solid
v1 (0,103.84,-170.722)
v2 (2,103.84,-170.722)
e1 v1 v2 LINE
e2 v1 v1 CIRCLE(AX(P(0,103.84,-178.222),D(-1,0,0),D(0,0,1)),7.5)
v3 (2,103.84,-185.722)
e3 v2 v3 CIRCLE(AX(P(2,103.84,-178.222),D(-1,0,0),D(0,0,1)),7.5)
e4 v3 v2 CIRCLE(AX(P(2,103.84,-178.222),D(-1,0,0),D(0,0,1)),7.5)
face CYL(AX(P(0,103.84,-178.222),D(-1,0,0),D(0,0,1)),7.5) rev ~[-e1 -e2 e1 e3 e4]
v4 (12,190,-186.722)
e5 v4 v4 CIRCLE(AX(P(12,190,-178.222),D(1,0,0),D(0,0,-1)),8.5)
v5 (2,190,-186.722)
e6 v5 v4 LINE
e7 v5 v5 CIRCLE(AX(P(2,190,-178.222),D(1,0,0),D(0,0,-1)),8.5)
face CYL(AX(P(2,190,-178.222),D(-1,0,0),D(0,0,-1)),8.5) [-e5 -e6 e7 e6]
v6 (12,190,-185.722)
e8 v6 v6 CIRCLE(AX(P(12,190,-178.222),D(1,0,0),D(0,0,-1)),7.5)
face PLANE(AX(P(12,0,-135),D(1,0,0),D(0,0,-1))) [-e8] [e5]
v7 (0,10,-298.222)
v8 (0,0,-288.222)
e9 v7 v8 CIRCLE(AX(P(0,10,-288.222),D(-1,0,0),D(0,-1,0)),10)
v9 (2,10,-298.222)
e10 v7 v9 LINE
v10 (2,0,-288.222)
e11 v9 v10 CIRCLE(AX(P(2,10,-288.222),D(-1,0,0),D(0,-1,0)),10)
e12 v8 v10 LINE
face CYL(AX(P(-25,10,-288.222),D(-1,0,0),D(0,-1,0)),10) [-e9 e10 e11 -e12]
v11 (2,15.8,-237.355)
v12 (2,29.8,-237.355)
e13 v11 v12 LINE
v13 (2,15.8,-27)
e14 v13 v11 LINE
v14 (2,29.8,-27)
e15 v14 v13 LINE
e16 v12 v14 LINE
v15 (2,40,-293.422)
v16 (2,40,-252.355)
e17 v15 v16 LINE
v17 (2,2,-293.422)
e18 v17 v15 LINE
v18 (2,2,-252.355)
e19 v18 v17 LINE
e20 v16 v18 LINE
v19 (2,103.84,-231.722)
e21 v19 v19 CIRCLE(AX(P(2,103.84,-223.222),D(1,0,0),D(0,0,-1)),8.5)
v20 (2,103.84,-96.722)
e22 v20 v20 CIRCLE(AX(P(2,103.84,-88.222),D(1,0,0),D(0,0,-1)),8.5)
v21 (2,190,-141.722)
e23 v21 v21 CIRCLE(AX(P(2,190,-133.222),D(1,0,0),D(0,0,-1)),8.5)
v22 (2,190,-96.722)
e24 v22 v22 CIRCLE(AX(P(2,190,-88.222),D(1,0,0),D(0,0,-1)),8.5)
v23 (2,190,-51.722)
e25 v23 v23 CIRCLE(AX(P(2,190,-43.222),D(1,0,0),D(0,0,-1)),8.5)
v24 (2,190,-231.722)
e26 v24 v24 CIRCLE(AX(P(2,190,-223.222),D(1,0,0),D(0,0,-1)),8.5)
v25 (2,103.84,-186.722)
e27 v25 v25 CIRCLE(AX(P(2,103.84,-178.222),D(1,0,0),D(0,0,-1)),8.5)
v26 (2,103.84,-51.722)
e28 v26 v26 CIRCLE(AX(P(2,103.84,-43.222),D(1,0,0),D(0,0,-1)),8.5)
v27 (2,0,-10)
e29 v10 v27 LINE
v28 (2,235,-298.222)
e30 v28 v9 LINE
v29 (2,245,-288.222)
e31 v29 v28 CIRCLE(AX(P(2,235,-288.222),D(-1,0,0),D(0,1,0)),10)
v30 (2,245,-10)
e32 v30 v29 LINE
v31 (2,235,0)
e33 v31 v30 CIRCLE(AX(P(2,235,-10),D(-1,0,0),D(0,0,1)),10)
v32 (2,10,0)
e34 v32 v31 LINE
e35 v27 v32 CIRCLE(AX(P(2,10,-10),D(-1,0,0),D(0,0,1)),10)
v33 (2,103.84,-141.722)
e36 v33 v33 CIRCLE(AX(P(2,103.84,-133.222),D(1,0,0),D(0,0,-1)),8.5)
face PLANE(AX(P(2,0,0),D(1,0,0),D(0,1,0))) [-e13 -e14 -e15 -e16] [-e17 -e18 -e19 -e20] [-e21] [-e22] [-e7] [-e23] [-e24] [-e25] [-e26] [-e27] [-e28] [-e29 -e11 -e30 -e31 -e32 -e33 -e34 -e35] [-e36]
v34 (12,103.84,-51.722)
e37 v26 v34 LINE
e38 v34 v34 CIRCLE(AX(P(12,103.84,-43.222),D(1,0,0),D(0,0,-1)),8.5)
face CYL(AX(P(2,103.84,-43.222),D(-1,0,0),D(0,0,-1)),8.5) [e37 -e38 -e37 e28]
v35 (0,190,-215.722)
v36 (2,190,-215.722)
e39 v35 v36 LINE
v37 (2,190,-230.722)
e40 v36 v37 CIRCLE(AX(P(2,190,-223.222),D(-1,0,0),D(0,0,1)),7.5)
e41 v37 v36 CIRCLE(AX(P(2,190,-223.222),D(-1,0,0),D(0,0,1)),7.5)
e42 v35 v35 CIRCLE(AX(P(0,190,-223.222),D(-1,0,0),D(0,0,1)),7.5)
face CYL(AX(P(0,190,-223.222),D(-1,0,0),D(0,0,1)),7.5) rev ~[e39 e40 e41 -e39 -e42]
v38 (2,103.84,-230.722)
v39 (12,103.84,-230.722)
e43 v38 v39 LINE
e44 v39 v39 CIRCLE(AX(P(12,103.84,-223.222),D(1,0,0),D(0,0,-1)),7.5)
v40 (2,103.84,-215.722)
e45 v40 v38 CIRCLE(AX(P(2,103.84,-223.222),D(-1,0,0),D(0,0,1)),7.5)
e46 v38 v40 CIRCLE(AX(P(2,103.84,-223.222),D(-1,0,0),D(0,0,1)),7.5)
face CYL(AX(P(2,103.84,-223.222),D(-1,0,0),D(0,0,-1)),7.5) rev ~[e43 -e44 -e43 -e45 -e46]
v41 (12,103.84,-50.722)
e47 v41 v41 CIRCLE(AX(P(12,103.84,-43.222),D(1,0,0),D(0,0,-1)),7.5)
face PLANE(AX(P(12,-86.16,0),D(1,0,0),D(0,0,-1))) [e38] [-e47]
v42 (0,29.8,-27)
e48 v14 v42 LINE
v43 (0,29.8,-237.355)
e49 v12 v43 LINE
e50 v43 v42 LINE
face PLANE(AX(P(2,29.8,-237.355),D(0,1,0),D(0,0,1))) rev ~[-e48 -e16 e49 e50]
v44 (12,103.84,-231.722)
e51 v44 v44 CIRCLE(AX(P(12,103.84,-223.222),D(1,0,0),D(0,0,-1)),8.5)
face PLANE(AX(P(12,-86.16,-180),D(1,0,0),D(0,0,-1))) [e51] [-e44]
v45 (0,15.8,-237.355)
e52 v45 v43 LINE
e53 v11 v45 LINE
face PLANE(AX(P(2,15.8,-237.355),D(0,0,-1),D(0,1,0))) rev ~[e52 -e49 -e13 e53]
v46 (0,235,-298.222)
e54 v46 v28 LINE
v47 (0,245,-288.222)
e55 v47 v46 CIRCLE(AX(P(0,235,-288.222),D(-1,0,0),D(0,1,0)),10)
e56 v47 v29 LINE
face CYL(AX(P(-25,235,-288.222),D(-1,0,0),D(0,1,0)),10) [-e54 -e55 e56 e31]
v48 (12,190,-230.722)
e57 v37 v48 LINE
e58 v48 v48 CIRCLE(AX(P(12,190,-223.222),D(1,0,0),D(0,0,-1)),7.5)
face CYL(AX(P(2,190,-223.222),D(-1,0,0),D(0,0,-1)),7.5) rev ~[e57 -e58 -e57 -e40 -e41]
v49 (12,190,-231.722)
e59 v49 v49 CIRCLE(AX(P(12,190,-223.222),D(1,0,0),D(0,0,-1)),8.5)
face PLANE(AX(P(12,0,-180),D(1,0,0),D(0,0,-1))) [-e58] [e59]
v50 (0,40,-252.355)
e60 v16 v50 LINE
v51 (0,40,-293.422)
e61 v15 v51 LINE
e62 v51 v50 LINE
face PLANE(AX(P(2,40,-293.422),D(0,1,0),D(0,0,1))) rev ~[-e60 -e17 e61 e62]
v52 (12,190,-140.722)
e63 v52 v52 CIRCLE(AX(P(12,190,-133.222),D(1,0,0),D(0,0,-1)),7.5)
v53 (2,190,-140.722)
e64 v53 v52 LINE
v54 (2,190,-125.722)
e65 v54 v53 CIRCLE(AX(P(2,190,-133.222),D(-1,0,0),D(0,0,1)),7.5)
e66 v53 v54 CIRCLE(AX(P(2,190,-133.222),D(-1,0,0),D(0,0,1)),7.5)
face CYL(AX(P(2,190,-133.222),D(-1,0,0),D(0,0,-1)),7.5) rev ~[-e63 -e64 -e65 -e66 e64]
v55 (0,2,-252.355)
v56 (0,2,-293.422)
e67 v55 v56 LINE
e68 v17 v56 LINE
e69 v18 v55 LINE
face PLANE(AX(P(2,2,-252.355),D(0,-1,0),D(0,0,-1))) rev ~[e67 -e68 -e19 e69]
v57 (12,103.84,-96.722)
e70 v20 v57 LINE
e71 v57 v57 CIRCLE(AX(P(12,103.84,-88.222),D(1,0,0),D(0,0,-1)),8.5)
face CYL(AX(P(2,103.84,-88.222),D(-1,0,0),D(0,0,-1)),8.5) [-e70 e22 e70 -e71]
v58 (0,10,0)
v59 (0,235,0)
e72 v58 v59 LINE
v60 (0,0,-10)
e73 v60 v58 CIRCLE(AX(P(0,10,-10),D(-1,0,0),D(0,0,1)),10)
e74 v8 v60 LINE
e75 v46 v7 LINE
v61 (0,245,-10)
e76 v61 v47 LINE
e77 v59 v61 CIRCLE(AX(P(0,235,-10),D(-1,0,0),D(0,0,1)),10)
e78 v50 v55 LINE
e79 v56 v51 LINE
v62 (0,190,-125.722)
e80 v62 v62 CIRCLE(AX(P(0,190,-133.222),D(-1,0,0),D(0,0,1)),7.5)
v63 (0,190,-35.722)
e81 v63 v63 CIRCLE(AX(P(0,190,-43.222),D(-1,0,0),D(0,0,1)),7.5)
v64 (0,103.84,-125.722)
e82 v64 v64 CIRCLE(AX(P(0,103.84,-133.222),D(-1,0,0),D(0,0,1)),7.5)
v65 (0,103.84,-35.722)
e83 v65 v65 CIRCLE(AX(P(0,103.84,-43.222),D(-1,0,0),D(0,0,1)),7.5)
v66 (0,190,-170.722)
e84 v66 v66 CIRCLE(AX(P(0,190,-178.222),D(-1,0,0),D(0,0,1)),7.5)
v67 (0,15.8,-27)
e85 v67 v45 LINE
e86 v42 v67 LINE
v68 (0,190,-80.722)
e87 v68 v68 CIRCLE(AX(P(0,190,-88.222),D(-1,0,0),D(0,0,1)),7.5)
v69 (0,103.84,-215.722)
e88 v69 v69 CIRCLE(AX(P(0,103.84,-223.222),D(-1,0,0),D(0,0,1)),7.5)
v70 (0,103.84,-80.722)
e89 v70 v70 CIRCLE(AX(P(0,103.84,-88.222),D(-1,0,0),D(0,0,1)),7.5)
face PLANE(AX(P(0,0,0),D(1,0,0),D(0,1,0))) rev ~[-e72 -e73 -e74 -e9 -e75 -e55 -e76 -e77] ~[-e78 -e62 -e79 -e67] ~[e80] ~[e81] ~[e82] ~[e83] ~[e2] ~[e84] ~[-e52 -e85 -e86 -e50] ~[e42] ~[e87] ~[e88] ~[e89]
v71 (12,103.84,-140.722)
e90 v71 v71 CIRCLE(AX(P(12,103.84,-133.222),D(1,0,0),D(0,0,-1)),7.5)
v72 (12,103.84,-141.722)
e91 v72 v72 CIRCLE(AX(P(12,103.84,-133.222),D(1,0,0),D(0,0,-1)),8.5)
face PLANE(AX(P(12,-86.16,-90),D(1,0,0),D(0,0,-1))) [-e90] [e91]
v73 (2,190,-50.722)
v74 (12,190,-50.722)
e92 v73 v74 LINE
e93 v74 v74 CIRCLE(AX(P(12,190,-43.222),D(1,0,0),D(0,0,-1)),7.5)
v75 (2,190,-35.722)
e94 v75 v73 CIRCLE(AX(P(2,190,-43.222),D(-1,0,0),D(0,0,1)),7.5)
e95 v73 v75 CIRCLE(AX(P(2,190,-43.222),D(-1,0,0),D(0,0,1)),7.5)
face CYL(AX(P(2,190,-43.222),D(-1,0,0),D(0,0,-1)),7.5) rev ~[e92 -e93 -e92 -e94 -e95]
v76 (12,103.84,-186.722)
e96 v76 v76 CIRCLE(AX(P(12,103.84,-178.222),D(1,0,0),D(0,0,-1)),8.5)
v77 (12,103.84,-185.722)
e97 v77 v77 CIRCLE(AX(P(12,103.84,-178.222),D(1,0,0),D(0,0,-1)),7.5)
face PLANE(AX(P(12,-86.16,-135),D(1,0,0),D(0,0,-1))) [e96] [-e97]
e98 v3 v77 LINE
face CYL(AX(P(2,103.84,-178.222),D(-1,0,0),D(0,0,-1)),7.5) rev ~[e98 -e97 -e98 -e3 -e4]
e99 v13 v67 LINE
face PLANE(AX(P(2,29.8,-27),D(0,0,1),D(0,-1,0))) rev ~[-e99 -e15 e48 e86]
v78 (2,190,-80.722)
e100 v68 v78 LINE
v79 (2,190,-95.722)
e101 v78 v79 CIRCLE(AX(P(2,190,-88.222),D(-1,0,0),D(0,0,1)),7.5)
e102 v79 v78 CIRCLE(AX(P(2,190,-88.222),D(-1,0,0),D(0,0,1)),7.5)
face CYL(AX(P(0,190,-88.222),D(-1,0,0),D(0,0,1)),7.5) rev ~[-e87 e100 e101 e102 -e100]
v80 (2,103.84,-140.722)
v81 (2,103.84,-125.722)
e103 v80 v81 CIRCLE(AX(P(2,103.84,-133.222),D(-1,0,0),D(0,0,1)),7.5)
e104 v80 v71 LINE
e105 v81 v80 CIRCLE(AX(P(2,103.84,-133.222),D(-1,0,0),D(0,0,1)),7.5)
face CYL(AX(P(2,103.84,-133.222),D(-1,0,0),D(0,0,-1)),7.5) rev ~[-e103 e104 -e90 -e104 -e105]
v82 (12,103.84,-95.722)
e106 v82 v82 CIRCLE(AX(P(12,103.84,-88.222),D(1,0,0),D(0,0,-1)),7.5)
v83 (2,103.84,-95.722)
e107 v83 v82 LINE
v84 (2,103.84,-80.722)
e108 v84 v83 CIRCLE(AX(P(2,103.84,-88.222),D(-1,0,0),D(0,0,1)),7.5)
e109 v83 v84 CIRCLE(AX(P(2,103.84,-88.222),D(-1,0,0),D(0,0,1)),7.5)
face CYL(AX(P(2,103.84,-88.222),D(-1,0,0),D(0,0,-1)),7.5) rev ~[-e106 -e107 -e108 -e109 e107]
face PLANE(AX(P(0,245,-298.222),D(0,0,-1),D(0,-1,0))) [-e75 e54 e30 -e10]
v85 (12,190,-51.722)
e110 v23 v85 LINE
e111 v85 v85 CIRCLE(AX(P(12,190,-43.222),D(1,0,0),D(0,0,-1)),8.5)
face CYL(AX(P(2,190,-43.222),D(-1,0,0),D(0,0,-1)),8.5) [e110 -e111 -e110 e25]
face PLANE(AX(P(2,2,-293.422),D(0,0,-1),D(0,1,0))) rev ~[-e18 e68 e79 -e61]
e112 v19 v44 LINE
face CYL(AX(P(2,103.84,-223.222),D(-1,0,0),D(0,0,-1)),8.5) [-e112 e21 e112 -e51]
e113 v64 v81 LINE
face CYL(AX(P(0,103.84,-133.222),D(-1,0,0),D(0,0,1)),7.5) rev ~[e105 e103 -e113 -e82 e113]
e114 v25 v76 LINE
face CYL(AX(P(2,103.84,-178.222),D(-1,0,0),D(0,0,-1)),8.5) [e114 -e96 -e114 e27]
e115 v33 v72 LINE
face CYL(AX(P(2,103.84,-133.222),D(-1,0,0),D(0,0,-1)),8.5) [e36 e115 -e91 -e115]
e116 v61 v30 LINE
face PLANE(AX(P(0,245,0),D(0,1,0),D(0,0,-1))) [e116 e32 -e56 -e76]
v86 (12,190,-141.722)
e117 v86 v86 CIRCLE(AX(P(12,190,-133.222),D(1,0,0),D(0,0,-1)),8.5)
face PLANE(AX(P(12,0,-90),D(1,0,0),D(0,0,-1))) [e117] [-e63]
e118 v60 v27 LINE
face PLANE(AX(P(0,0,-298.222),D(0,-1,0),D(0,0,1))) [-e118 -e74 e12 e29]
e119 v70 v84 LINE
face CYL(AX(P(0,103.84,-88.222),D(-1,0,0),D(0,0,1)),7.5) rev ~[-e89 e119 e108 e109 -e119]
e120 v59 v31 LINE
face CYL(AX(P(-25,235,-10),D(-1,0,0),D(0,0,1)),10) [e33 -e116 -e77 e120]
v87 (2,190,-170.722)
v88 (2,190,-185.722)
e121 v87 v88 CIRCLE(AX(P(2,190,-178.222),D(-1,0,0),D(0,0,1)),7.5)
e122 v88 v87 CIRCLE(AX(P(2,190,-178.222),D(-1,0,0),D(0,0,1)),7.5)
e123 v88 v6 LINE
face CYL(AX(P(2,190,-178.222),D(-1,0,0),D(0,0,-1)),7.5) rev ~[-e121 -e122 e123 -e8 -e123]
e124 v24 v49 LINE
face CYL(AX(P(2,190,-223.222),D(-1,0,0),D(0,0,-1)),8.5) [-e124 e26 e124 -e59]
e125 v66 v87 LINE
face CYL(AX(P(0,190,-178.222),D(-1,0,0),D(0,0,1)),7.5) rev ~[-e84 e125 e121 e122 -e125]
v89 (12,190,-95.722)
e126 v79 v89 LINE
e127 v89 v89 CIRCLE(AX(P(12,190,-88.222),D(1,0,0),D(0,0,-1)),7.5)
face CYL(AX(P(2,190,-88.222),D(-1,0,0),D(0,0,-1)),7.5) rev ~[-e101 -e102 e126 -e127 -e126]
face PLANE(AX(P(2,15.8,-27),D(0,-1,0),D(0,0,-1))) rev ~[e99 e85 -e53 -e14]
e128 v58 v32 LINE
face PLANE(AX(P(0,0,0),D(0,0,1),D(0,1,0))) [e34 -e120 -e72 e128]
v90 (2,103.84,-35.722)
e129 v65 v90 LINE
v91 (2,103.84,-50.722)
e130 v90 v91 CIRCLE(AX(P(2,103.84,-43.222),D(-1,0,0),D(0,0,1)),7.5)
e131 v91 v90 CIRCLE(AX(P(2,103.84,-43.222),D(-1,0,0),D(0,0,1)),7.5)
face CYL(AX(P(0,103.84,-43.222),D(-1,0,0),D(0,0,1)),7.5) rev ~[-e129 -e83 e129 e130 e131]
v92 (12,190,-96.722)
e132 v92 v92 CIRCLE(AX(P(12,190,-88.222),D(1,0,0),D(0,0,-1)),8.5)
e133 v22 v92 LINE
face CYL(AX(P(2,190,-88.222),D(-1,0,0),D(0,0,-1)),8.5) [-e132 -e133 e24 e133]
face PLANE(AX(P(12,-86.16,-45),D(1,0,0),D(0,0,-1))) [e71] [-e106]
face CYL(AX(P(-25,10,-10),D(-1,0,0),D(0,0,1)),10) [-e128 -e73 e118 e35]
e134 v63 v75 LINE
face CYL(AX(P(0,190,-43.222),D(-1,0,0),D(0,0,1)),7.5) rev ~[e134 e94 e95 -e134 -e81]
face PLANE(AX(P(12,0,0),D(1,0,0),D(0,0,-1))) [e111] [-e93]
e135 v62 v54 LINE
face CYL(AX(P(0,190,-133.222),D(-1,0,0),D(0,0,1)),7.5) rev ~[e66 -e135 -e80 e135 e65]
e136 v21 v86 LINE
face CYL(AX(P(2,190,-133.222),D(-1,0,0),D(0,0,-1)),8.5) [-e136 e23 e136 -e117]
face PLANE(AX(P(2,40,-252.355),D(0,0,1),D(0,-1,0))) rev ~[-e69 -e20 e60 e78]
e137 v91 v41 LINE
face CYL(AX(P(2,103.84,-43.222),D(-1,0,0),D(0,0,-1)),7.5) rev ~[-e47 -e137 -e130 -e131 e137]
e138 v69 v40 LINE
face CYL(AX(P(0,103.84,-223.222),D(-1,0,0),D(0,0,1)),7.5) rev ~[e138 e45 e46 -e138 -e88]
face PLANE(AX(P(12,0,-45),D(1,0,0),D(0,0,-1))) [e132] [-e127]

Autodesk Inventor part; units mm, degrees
ref_plane "YZ Plane" through (0, 0, 0) normal (1, 0, 0) x (0, 1, 0)
ref_plane "XZ Plane" through (0, 0, 0) normal (0, 1, 0) x (-1, 0, 0)
ref_plane "XY Plane" through (0, 0, 0) normal (0, 0, 1) x (1, 0, 0)
sketch "Sketch1" plane through (0, 0, 0) normal (1, 0, 0) x (0, 1, 0)
  line L0 (0, 0) -> (245, 0)
  line L1 (245, 0) -> (245, -298.222)
  line L2 (245, -298.222) -> (0, -298.222)
  line L3 (0, -298.222) -> (0, 0)
  dimension "d0" = 245
  dimension "d1" = 298.222
extrude "Extrusion1" add sketch "Sketch1" along normal blind 2
sketch "Sketch2" plane through (2, 0, 0) normal (1, 0, 0) x (0, 0, -1)
  line L0 (252.355, 2) -> (293.422, 2)
  line L1 (293.422, 2) -> (293.422, 40)
  line L2 (293.422, 40) -> (252.355, 40)
  line L3 (252.355, 40) -> (252.355, 2)
  line L4 (0, 0) -> (298.222, 0) projected
  line L5 (0, 245) -> (0, 0) projected
  line L6 (298.222, 0) -> (298.222, 245) projected
  dimension "d4" = 2
  dimension "d6" = 38
  dimension "d7" = 41.067
  dimension "d8" = 4.8
extrude "Extrusion2" cut sketch "Sketch2" against normal blind 10
sketch "Sketch3" plane through (2, 0, 0) normal (1, 0, 0) x (0, 0, -1)
  line L0 (237.355, 29.8) -> (27, 29.8)
  line L1 (27, 29.8) -> (27, 15.8)
  line L2 (27, 15.8) -> (237.355, 15.8)
  line L3 (237.355, 15.8) -> (237.355, 29.8)
  line L4 (252.355, 2) -> (252.355, 40) projected
  line L5 (0, 0) -> (298.222, 0) projected
  line L6 (0, 245) -> (0, 0) projected
  dimension "d11" = 15
  dimension "d12" = 15.8
  dimension "d13" = 14
  dimension "d14" = 27
extrude "Extrusion3" cut sketch "Sketch3" against normal blind 10
sketch "Sketch4" plane through (0, 0, 0) normal (-1, 0, 0) x (0, 0, 1)
  circle A0 centre (-223.222, 190) radius 7.5
  line L0 (0, 245) -> (-298.222, 245) projected
  line L1 (-298.222, 245) -> (-298.222, 0) projected
  point P0 (0, 0)
  dimension "d17" = 15
  dimension "d18" = 55
  dimension "d19" = 75
extrude "Extrusion4" cut sketch "Sketch4" against normal blind 10
pattern_linear "Rectangular Pattern1" count 5 spacing 45 along (0, 0, 1) of "Extrusion4"
pattern_linear "Rectangular Pattern2" count 2 spacing 86.16 along (0, -1, 0) of "Extrusion4", "Rectangular Pattern1"
sketch "Sketch5" plane through (2, 0, 0) normal (1, 0, 0) x (0, 0, -1)
  circle A0 centre (43.222, 190) radius 7.5 projected
  circle A1 centre (43.222, 190) radius 7.5
  circle A2 centre (43.222, 190) radius 8.5
  point P0 (0, 0)
  dimension "d28" = 17
extrude "Extrusion5" add sketch "Sketch5" along normal blind 10
pattern_linear "Rectangular Pattern3" count 5 spacing 45 along (0, 0, -1) of "Extrusion5"
pattern_linear "Rectangular Pattern4" count 2 spacing 86.16 along (0, -1, 0) of "Extrusion5", "Rectangular Pattern3"
fillet "Fillet1" radius 10 4 edges at (1, 245, 0) (1, 245, -298.222) (1, 0, -298.222) (1, 0, 0)
properties part number "frount glass" material "Glass"
